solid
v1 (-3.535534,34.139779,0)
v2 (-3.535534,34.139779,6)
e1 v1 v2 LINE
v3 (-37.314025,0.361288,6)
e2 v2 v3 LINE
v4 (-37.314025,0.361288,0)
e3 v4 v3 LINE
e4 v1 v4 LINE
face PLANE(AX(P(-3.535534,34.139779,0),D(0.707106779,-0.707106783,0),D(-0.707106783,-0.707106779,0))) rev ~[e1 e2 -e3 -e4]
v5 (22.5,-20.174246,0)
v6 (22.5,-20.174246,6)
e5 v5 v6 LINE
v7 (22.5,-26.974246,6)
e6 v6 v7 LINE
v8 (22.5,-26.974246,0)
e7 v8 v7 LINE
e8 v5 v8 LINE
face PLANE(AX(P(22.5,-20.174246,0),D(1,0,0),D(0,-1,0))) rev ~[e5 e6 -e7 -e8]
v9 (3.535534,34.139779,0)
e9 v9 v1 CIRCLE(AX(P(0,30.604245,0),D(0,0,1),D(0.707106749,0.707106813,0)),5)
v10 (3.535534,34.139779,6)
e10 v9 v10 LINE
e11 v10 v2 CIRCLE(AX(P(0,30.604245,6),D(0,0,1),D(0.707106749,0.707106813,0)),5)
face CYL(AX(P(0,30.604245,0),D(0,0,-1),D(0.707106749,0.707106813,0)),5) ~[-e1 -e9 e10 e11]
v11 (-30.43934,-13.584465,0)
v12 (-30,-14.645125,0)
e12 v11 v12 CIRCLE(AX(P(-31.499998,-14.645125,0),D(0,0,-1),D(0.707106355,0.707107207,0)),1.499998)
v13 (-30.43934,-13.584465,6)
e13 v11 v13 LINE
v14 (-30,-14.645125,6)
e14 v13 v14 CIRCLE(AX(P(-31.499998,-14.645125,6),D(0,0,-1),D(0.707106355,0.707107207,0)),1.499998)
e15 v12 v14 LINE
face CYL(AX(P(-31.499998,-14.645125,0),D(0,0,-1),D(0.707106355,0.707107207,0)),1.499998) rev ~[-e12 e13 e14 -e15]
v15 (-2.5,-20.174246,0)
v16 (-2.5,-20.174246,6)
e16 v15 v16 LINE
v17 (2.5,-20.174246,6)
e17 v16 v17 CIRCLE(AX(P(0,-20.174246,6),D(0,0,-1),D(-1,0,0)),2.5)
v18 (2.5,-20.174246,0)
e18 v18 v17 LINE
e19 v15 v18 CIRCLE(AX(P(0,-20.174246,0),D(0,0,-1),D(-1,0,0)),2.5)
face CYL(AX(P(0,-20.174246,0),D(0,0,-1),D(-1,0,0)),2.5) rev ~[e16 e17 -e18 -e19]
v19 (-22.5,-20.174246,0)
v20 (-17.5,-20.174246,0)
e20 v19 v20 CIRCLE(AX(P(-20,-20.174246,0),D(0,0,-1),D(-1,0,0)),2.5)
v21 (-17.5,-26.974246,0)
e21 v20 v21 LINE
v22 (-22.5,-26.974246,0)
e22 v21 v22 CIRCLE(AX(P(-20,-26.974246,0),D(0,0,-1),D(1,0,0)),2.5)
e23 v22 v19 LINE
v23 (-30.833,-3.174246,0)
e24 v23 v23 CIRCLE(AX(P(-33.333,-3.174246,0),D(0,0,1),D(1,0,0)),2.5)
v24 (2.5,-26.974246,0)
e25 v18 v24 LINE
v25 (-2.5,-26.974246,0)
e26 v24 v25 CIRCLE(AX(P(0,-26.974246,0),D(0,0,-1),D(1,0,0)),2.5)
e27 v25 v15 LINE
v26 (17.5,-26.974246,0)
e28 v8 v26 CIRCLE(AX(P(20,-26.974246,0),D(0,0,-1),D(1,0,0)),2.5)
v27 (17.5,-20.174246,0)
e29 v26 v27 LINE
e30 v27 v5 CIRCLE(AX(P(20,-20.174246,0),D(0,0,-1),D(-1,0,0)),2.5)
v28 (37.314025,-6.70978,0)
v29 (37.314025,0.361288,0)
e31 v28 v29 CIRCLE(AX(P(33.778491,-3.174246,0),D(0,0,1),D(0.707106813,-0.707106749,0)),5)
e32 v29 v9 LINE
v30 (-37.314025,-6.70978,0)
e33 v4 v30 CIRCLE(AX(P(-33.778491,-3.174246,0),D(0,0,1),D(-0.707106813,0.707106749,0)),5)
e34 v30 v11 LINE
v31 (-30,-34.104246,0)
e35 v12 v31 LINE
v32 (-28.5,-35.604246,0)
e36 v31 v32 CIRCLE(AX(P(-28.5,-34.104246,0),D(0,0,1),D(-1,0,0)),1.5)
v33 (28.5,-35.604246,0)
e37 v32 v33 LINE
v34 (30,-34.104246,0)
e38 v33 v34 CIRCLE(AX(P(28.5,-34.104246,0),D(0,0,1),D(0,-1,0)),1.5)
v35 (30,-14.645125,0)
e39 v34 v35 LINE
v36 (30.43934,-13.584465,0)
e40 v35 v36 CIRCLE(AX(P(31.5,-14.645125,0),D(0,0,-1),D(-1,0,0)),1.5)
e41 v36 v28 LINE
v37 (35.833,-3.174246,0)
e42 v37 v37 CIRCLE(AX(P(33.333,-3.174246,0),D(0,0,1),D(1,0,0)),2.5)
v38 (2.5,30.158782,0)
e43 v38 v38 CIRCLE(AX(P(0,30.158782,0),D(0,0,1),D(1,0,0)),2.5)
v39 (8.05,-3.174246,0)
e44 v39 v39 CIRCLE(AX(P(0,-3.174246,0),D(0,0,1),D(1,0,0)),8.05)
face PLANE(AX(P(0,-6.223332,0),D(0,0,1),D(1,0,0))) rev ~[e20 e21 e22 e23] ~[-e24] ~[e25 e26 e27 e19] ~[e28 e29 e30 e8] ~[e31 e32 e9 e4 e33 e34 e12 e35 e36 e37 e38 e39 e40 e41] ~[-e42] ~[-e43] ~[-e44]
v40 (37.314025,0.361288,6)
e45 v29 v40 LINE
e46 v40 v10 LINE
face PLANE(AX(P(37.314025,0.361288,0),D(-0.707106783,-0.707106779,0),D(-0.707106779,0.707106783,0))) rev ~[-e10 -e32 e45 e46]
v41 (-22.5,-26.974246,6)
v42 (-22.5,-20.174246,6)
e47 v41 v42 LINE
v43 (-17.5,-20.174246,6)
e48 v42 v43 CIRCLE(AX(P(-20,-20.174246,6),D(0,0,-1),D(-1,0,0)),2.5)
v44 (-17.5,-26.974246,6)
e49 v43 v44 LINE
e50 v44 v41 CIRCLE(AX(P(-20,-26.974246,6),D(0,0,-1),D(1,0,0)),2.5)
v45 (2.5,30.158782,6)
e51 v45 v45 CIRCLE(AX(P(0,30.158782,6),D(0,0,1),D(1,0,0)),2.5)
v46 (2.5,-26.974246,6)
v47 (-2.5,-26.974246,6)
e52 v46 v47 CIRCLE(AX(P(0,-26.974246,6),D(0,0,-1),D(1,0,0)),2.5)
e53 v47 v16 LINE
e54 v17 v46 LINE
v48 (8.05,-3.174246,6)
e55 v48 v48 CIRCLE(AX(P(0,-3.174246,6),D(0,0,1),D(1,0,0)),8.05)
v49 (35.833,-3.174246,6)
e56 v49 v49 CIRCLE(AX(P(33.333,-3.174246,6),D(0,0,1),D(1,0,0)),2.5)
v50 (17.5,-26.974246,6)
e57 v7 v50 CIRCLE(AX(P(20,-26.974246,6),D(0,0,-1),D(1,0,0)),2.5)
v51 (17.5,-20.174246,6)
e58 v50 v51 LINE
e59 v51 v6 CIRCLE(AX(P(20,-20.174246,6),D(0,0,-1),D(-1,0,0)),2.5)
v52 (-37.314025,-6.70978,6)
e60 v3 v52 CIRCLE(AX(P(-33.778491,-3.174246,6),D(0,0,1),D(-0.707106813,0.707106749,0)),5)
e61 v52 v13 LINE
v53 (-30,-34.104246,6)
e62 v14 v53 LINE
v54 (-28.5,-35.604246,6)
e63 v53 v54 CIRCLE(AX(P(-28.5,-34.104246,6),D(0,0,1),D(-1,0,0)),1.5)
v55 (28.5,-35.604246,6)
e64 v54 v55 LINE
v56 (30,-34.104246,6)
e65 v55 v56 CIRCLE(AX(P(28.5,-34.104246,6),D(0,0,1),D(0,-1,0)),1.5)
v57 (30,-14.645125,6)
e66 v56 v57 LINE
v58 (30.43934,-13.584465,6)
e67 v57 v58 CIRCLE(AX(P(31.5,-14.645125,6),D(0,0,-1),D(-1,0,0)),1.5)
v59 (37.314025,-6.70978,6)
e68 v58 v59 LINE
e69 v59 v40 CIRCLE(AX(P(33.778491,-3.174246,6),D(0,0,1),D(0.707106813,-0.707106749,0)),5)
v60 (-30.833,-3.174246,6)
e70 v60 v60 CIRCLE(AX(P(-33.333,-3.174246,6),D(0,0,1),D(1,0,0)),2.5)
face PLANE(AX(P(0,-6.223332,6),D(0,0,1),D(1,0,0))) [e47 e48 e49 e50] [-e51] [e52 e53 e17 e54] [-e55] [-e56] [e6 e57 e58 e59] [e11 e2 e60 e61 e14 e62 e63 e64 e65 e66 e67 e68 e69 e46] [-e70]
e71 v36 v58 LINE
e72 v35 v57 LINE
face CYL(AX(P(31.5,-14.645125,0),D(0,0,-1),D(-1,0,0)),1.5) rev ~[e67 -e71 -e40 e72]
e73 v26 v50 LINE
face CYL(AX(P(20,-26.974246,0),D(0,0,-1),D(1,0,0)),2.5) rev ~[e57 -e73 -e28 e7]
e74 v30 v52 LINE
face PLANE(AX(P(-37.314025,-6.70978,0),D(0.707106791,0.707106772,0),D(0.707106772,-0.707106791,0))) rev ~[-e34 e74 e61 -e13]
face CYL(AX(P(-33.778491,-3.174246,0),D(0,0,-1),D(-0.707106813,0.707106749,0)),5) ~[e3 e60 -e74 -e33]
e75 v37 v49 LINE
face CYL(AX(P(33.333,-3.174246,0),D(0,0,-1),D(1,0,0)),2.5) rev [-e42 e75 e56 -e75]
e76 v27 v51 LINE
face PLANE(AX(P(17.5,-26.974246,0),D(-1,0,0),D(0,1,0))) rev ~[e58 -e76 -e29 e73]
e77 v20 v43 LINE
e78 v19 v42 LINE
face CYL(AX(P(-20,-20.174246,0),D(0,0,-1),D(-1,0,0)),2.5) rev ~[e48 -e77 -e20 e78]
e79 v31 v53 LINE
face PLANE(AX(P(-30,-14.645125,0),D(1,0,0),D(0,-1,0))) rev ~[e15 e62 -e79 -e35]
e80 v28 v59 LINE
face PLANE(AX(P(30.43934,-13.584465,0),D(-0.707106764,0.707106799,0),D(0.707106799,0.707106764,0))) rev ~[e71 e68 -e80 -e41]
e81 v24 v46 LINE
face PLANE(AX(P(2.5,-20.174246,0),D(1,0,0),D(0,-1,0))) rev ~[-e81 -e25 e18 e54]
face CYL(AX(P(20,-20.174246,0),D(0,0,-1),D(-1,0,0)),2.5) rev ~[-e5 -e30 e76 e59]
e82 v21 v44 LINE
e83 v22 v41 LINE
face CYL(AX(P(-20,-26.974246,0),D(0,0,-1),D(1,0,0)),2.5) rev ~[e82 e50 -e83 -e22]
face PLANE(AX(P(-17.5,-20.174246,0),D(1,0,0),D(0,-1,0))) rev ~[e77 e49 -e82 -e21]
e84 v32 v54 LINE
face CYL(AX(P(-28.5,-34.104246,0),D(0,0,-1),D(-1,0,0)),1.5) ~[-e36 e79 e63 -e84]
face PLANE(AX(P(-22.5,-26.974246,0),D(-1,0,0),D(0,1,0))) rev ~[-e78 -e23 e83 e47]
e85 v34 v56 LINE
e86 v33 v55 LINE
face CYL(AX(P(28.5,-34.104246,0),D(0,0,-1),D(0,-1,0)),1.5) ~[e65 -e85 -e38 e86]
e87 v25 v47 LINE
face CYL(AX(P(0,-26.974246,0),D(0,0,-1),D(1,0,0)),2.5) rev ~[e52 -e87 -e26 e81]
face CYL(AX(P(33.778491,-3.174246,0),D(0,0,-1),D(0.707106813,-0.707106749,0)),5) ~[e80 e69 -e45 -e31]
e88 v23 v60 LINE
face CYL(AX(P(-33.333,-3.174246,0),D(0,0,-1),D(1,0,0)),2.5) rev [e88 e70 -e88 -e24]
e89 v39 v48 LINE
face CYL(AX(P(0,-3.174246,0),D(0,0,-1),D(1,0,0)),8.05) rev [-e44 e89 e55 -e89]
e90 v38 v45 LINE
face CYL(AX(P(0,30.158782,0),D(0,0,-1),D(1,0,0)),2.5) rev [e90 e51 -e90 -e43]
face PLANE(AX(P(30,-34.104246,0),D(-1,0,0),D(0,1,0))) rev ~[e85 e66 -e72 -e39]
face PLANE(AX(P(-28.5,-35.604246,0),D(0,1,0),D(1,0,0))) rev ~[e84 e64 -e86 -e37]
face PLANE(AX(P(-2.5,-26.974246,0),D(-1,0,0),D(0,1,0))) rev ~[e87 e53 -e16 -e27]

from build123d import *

# Parameters (mm, degrees)
F0_R     = 4.6
F0_R_2   = 8.05
F0_R_3   = 2.5
F1_DEPTH = 6


# Not quite as in the source:
# - ends of sketch curves that miss each other by under 0.0002 mm in the source are joined


with BuildPart() as f1:
    # F0 (on Top) → F1 (new body)
    with BuildSketch(Plane.XY):
        with BuildLine():
            ThreePointArc((-30, -34.104246), (-29.5606601718, -35.1649061718), (-28.5, -35.604246))
            Line((-28.5, -35.604246), (28.5, -35.604246))
            ThreePointArc((28.5, -35.604246), (29.5606601718, -35.1649061718), (30, -34.104246))
            Line((30, -34.104246), (30, -14.645125))
            ThreePointArc((30, -14.645125), (30.1141807012, -14.0710998515), (30.4393398282, -13.5844648282))
            Line((30.4393398282, -13.5844648282), (37.314025, -6.70978))
            ThreePointArc((37.314025, -6.70978), (38.778491, -3.174246), (37.3140249059, 0.3612879059))
            Line((37.3140249059, 0.3612879059), (3.535534, 34.139779))
            ThreePointArc((3.535534, 34.139779), (0, 35.604245), (-3.5355339059, 34.1397789059))
            Line((-3.5355339059, 34.1397789059), (-37.314025, 0.361288))
            ThreePointArc((-37.314025, 0.361288), (-38.778491, -3.174246), (-37.3140249059, -6.7097799059))
            Line((-37.3140249059, -6.7097799059), (-30.43934, -13.584465))
            ThreePointArc((-30.43934, -13.584465), (-30.1141807012, -14.0710998515), (-30, -14.645125))
            Line((-30, -14.645125), (-30, -34.104246))
        make_face()
        with BuildLine():
            ThreePointArc((-24.6, -20.174246), (-20, -15.574246), (-15.4, -20.174246))
            Line((-15.4, -20.174246), (-15.4, -26.974246))
            ThreePointArc((-15.4, -26.974246), (-20, -31.574246), (-24.6, -26.974246))
            Line((-24.6, -26.974246), (-24.6, -20.174246))
        make_face(mode=Mode.SUBTRACT)
        with Locations((-33.333, -3.174246)):
            Circle(F0_R, mode=Mode.SUBTRACT)
        with BuildLine():
            ThreePointArc((4.6, -26.974246), (0, -31.574246), (-4.6, -26.974246))
            Line((-4.6, -26.974246), (-4.6, -20.174246))
            ThreePointArc((-4.6, -20.174246), (0, -15.574246), (4.6, -20.174246))
            Line((4.6, -20.174246), (4.6, -26.974246))
        make_face(mode=Mode.SUBTRACT)
        with BuildLine():
            ThreePointArc((24.6, -26.974246), (20, -31.574246), (15.4, -26.974246))
            Line((15.4, -26.974246), (15.4, -20.174246))
            ThreePointArc((15.4, -20.174246), (20, -15.574246), (24.6, -20.174246))
            Line((24.6, -20.174246), (24.6, -26.974246))
        make_face(mode=Mode.SUBTRACT)
        with Locations((0, -3.174246)):
            Circle(F0_R_2, mode=Mode.SUBTRACT)
        with Locations((33.333, -3.174246)):
            Circle(F0_R, mode=Mode.SUBTRACT)
        with Locations((0, 30.158782)):
            Circle(F0_R, mode=Mode.SUBTRACT)
        with Locations((-33.333, -3.174246)):
            Circle(F0_R)
        with Locations((-33.333, -3.174246)):
            Circle(F0_R_3, mode=Mode.SUBTRACT)
        with Locations((0, 30.158782)):
            Circle(F0_R)
        with Locations((0, 30.158782)):
            Circle(F0_R_3, mode=Mode.SUBTRACT)
        with Locations((33.333, -3.174246)):
            Circle(F0_R)
        with Locations((33.333, -3.174246)):
            Circle(F0_R_3, mode=Mode.SUBTRACT)
        with BuildLine():
            Line((15.4, -20.174246), (15.4, -26.974246))
            ThreePointArc((15.4, -26.974246), (20, -31.574246), (24.6, -26.974246))
            Line((24.6, -26.974246), (24.6, -20.174246))
            ThreePointArc((24.6, -20.174246), (20, -15.574246), (15.4, -20.174246))
        make_face()
        with BuildLine():
            ThreePointArc((22.5, -26.974246), (20, -29.474246), (17.5, -26.974246))
            Line((17.5, -26.974246), (17.5, -20.174246))
            ThreePointArc((17.5, -20.174246), (20, -17.674246), (22.5, -20.174246))
            Line((22.5, -20.174246), (22.5, -26.974246))
        make_face(mode=Mode.SUBTRACT)
        with BuildLine():
            Line((-4.6, -20.174246), (-4.6, -26.974246))
            ThreePointArc((-4.6, -26.974246), (0, -31.574246), (4.6, -26.974246))
            Line((4.6, -26.974246), (4.6, -20.174246))
            ThreePointArc((4.6, -20.174246), (0, -15.574246), (-4.6, -20.174246))
        make_face()
        with BuildLine():
            ThreePointArc((2.5, -26.974246), (0, -29.474246), (-2.5, -26.974246))
            Line((-2.5, -26.974246), (-2.5, -20.174246))
            ThreePointArc((-2.5, -20.174246), (0, -17.674246), (2.5, -20.174246))
            Line((2.5, -20.174246), (2.5, -26.974246))
        make_face(mode=Mode.SUBTRACT)
        with BuildLine():
            Line((-15.4, -26.974246), (-15.4, -20.174246))
            ThreePointArc((-15.4, -20.174246), (-20, -15.574246), (-24.6, -20.174246))
            Line((-24.6, -20.174246), (-24.6, -26.974246))
            ThreePointArc((-24.6, -26.974246), (-20, -31.574246), (-15.4, -26.974246))
        make_face()
        with BuildLine():
            ThreePointArc((-17.5, -26.974246), (-20, -29.474246), (-22.5, -26.974246))
            Line((-22.5, -26.974246), (-22.5, -20.174246))
            ThreePointArc((-22.5, -20.174246), (-20, -17.674246), (-17.5, -20.174246))
            Line((-17.5, -20.174246), (-17.5, -26.974246))
        make_face(mode=Mode.SUBTRACT)
    extrude(amount=F1_DEPTH)


solid = f1.part
